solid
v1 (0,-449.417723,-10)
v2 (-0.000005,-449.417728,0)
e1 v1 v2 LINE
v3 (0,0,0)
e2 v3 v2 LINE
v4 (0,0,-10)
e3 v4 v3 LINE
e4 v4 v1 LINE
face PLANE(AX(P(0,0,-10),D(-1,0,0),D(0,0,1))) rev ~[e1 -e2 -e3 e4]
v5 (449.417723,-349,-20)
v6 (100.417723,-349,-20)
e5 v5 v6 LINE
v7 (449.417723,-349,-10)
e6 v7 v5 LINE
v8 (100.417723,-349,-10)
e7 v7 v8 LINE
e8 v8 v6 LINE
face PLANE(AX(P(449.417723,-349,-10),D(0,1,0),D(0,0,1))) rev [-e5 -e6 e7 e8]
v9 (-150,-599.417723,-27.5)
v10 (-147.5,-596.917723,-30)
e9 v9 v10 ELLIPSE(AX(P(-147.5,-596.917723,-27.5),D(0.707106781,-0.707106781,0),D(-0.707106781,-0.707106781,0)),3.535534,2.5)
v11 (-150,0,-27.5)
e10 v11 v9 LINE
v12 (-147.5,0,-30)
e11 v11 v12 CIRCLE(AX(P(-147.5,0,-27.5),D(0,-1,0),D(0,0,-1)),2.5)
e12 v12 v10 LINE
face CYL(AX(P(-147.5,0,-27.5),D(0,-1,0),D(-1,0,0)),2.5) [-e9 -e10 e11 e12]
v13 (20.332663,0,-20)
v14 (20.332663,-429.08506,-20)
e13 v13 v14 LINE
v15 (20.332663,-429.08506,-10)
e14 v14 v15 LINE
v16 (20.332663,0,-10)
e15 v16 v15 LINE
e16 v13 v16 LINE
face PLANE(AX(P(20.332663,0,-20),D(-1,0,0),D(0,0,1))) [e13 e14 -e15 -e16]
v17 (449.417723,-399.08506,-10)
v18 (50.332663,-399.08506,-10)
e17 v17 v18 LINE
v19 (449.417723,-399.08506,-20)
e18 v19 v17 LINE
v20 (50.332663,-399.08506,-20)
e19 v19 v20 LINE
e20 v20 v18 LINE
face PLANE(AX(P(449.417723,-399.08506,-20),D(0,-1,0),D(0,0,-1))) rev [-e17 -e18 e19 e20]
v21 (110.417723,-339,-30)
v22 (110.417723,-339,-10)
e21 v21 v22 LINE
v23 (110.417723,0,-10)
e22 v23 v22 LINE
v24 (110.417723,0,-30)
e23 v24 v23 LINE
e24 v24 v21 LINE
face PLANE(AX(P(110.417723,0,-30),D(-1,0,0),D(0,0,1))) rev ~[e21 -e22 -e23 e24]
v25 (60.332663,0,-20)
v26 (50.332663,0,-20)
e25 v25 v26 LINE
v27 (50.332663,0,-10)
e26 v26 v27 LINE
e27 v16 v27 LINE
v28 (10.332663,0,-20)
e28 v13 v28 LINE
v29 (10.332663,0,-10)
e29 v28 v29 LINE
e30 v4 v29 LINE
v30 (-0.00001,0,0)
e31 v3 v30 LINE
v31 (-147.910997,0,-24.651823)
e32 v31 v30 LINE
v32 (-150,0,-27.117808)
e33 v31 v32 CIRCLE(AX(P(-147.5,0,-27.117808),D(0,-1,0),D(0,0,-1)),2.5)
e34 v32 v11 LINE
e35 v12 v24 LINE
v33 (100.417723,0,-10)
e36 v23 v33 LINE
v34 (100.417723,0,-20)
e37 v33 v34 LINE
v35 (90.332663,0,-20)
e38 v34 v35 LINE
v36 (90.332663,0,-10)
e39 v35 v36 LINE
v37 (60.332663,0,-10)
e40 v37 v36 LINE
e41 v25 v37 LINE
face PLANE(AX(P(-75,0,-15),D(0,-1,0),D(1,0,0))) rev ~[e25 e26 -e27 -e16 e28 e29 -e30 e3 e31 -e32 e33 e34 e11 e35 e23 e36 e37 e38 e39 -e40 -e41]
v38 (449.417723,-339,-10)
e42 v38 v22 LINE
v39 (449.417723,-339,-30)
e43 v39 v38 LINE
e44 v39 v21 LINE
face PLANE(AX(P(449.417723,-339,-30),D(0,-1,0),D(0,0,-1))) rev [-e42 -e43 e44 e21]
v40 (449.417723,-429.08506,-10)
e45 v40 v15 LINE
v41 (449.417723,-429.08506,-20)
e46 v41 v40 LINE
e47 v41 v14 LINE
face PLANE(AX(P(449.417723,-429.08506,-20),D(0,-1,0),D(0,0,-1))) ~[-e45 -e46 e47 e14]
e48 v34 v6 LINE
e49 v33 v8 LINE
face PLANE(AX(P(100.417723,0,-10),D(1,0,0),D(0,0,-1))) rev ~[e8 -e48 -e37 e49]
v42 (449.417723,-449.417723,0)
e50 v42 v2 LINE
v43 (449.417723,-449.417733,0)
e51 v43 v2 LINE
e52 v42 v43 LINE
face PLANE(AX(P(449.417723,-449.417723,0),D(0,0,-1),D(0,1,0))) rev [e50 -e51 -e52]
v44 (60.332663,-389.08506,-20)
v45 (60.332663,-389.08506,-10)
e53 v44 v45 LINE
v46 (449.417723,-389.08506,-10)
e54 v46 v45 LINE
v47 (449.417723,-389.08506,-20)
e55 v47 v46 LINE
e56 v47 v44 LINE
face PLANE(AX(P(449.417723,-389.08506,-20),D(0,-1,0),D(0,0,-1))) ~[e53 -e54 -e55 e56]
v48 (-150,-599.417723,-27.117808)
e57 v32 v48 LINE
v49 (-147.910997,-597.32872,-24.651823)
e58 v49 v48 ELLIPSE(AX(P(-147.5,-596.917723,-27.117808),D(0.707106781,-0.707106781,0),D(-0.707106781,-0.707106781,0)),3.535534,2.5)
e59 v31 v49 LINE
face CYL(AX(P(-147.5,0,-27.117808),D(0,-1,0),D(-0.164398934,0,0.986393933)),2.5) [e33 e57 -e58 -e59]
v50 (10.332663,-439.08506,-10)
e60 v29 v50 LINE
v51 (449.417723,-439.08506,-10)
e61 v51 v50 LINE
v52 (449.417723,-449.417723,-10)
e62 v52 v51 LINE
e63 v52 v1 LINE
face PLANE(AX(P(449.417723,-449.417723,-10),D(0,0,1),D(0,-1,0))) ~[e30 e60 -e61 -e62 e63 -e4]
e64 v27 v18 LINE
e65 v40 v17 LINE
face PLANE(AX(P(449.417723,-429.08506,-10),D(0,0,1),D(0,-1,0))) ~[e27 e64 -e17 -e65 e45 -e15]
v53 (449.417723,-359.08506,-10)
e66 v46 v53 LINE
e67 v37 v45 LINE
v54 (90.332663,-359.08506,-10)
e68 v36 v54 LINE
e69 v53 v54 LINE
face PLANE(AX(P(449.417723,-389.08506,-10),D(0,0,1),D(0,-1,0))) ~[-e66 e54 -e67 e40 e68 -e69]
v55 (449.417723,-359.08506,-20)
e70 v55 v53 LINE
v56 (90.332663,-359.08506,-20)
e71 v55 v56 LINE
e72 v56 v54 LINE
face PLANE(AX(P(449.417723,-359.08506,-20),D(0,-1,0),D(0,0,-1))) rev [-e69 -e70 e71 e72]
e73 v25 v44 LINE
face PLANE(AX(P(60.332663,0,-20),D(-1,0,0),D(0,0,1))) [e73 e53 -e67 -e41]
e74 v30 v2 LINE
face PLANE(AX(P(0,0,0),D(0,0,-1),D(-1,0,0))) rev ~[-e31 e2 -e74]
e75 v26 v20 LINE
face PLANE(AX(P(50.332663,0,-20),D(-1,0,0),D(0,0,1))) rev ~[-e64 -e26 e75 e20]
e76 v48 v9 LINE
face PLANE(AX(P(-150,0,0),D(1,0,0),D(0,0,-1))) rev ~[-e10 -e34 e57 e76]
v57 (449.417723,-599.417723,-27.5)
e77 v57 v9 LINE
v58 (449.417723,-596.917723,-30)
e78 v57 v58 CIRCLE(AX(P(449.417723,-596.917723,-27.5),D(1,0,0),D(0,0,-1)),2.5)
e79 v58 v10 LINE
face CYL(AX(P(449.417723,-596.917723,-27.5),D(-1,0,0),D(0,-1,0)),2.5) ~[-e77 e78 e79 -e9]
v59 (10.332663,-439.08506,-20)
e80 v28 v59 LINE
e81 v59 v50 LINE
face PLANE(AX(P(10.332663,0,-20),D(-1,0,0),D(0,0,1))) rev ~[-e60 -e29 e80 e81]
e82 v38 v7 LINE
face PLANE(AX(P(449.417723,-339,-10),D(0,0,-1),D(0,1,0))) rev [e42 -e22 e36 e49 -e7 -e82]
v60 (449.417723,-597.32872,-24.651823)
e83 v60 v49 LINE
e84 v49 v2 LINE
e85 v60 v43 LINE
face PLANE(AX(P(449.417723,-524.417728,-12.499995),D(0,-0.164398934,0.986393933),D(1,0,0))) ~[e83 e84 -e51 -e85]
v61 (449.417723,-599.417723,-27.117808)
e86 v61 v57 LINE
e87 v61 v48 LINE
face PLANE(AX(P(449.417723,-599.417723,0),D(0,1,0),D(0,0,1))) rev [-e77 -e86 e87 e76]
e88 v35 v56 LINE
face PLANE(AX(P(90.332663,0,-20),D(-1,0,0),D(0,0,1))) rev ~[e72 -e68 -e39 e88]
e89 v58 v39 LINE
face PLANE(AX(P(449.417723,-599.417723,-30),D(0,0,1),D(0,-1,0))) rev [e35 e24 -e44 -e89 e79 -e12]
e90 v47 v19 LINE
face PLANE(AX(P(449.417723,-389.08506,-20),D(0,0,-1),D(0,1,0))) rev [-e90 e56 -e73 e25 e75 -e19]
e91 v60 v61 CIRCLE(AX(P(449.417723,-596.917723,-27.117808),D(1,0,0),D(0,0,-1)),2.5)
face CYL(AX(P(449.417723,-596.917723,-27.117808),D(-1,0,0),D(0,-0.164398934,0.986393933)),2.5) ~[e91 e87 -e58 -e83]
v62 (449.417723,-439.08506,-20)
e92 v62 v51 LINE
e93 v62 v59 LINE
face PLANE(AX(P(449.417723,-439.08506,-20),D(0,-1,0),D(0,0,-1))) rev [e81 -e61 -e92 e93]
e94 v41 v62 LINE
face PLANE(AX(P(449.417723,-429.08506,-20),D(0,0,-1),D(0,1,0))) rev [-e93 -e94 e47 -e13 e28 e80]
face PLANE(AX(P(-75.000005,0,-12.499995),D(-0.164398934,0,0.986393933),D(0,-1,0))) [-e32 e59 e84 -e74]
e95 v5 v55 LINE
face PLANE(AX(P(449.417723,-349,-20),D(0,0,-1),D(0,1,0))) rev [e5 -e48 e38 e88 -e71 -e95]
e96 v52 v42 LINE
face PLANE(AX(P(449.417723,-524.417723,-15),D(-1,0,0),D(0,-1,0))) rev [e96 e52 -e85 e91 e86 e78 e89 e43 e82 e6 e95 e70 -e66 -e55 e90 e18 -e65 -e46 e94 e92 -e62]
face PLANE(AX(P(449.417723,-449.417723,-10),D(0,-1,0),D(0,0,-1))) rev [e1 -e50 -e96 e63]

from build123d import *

# Parameters (mm, degrees)
F0_W        = 30
F0_H        = 10
F0_W_2      = 10.3326633751
F1_DEPTH    = 600
F2_T1_DEPTH = 1362.4185197182
F3_SIZE2    = 149.99999
F3_SIZE     = 24.99999
F4_R        = 2.5


# Not quite as in the source:
# - a fillet or chamfer that OpenCascade refuses, or shapes differently, is made with other operations: its cross-section is extruded or revolved along the edge and cut away or added
# - a fillet or chamfer is up to 0.001 mm smaller than in the source, because OpenCascade refuses the exact size


with BuildPart() as f1:
    # F0 (on Front) → F1 (new body)
    with BuildSketch(Plane.XZ):
        Polygon((0, -10), (0, 0), (-150, 0), (-150, -30), (0, -30), (0, -20), align=None)
        with Locations((75.3326633751, -15)):
            Rectangle(F0_W, F0_H)
        with Locations((5.1663316875, -15)):
            Rectangle(F0_W_2, F0_H)
        with Locations((35.3326633751, -15)):
            Rectangle(F0_W, F0_H)
        Polygon((10.3326633751, -20), (0, -20), (0, -30), (100.4177228767, -30), (100.4177228767, -20), (90.3326633751, -20), (60.3326633751, -20), (50.3326633751, -20), (20.3326633751, -20), align=None)
        Polygon((100.4177228767, -20), (100.4177228767, -30), (110.4177228767, -30), (110.4177228767, -10), (100.4177228767, -10), align=None)
    extrude(amount=F1_DEPTH)

    # F2: chamfer of 261 on 1 edges, made by hand

    # F2_s2 → F2_t1 (cut)
    with BuildSketch(Plane.XY.offset(-701.2092598591)):
        Polygon((110.4177228767, -339), (-150.5822771233, -600), (110.4177228767, -600), align=None)
    extrude(amount=F2_T1_DEPTH, mode=Mode.SUBTRACT)

    # F3 (size 25 and 150 in the source; OpenCascade refuses exactly that, so slightly less here)
    f3_edges = [f1.edges().sort_by_distance(p)[0] for p in [
        (-150, -299.708861, 0),
    ]]
    f3_side = f1.faces().sort_by_distance((-150, -299.708861, -15))[0]
    chamfer(f3_edges, length=F3_SIZE, length2=F3_SIZE2, reference=f3_side)

    # F4
    f4_edges = [f1.edges().sort_by_distance(p)[0] for p in [
        (-150, -299.708861, -24.99999),
        (-150, -299.708861, -30),
    ]]
    fillet(f4_edges, radius=F4_R)

    # F5: F1 across face


with BuildPart() as f1_1:
    add(f1.part)
    add(f1.part.mirror(Plane(origin=(-9.807206416, -459.2249292927, -20.1902158269), x_dir=(0.7071067812, 0.7071067812, 0), z_dir=(0.7071067812, -0.7071067812, 0))))


solid = f1_1.part
